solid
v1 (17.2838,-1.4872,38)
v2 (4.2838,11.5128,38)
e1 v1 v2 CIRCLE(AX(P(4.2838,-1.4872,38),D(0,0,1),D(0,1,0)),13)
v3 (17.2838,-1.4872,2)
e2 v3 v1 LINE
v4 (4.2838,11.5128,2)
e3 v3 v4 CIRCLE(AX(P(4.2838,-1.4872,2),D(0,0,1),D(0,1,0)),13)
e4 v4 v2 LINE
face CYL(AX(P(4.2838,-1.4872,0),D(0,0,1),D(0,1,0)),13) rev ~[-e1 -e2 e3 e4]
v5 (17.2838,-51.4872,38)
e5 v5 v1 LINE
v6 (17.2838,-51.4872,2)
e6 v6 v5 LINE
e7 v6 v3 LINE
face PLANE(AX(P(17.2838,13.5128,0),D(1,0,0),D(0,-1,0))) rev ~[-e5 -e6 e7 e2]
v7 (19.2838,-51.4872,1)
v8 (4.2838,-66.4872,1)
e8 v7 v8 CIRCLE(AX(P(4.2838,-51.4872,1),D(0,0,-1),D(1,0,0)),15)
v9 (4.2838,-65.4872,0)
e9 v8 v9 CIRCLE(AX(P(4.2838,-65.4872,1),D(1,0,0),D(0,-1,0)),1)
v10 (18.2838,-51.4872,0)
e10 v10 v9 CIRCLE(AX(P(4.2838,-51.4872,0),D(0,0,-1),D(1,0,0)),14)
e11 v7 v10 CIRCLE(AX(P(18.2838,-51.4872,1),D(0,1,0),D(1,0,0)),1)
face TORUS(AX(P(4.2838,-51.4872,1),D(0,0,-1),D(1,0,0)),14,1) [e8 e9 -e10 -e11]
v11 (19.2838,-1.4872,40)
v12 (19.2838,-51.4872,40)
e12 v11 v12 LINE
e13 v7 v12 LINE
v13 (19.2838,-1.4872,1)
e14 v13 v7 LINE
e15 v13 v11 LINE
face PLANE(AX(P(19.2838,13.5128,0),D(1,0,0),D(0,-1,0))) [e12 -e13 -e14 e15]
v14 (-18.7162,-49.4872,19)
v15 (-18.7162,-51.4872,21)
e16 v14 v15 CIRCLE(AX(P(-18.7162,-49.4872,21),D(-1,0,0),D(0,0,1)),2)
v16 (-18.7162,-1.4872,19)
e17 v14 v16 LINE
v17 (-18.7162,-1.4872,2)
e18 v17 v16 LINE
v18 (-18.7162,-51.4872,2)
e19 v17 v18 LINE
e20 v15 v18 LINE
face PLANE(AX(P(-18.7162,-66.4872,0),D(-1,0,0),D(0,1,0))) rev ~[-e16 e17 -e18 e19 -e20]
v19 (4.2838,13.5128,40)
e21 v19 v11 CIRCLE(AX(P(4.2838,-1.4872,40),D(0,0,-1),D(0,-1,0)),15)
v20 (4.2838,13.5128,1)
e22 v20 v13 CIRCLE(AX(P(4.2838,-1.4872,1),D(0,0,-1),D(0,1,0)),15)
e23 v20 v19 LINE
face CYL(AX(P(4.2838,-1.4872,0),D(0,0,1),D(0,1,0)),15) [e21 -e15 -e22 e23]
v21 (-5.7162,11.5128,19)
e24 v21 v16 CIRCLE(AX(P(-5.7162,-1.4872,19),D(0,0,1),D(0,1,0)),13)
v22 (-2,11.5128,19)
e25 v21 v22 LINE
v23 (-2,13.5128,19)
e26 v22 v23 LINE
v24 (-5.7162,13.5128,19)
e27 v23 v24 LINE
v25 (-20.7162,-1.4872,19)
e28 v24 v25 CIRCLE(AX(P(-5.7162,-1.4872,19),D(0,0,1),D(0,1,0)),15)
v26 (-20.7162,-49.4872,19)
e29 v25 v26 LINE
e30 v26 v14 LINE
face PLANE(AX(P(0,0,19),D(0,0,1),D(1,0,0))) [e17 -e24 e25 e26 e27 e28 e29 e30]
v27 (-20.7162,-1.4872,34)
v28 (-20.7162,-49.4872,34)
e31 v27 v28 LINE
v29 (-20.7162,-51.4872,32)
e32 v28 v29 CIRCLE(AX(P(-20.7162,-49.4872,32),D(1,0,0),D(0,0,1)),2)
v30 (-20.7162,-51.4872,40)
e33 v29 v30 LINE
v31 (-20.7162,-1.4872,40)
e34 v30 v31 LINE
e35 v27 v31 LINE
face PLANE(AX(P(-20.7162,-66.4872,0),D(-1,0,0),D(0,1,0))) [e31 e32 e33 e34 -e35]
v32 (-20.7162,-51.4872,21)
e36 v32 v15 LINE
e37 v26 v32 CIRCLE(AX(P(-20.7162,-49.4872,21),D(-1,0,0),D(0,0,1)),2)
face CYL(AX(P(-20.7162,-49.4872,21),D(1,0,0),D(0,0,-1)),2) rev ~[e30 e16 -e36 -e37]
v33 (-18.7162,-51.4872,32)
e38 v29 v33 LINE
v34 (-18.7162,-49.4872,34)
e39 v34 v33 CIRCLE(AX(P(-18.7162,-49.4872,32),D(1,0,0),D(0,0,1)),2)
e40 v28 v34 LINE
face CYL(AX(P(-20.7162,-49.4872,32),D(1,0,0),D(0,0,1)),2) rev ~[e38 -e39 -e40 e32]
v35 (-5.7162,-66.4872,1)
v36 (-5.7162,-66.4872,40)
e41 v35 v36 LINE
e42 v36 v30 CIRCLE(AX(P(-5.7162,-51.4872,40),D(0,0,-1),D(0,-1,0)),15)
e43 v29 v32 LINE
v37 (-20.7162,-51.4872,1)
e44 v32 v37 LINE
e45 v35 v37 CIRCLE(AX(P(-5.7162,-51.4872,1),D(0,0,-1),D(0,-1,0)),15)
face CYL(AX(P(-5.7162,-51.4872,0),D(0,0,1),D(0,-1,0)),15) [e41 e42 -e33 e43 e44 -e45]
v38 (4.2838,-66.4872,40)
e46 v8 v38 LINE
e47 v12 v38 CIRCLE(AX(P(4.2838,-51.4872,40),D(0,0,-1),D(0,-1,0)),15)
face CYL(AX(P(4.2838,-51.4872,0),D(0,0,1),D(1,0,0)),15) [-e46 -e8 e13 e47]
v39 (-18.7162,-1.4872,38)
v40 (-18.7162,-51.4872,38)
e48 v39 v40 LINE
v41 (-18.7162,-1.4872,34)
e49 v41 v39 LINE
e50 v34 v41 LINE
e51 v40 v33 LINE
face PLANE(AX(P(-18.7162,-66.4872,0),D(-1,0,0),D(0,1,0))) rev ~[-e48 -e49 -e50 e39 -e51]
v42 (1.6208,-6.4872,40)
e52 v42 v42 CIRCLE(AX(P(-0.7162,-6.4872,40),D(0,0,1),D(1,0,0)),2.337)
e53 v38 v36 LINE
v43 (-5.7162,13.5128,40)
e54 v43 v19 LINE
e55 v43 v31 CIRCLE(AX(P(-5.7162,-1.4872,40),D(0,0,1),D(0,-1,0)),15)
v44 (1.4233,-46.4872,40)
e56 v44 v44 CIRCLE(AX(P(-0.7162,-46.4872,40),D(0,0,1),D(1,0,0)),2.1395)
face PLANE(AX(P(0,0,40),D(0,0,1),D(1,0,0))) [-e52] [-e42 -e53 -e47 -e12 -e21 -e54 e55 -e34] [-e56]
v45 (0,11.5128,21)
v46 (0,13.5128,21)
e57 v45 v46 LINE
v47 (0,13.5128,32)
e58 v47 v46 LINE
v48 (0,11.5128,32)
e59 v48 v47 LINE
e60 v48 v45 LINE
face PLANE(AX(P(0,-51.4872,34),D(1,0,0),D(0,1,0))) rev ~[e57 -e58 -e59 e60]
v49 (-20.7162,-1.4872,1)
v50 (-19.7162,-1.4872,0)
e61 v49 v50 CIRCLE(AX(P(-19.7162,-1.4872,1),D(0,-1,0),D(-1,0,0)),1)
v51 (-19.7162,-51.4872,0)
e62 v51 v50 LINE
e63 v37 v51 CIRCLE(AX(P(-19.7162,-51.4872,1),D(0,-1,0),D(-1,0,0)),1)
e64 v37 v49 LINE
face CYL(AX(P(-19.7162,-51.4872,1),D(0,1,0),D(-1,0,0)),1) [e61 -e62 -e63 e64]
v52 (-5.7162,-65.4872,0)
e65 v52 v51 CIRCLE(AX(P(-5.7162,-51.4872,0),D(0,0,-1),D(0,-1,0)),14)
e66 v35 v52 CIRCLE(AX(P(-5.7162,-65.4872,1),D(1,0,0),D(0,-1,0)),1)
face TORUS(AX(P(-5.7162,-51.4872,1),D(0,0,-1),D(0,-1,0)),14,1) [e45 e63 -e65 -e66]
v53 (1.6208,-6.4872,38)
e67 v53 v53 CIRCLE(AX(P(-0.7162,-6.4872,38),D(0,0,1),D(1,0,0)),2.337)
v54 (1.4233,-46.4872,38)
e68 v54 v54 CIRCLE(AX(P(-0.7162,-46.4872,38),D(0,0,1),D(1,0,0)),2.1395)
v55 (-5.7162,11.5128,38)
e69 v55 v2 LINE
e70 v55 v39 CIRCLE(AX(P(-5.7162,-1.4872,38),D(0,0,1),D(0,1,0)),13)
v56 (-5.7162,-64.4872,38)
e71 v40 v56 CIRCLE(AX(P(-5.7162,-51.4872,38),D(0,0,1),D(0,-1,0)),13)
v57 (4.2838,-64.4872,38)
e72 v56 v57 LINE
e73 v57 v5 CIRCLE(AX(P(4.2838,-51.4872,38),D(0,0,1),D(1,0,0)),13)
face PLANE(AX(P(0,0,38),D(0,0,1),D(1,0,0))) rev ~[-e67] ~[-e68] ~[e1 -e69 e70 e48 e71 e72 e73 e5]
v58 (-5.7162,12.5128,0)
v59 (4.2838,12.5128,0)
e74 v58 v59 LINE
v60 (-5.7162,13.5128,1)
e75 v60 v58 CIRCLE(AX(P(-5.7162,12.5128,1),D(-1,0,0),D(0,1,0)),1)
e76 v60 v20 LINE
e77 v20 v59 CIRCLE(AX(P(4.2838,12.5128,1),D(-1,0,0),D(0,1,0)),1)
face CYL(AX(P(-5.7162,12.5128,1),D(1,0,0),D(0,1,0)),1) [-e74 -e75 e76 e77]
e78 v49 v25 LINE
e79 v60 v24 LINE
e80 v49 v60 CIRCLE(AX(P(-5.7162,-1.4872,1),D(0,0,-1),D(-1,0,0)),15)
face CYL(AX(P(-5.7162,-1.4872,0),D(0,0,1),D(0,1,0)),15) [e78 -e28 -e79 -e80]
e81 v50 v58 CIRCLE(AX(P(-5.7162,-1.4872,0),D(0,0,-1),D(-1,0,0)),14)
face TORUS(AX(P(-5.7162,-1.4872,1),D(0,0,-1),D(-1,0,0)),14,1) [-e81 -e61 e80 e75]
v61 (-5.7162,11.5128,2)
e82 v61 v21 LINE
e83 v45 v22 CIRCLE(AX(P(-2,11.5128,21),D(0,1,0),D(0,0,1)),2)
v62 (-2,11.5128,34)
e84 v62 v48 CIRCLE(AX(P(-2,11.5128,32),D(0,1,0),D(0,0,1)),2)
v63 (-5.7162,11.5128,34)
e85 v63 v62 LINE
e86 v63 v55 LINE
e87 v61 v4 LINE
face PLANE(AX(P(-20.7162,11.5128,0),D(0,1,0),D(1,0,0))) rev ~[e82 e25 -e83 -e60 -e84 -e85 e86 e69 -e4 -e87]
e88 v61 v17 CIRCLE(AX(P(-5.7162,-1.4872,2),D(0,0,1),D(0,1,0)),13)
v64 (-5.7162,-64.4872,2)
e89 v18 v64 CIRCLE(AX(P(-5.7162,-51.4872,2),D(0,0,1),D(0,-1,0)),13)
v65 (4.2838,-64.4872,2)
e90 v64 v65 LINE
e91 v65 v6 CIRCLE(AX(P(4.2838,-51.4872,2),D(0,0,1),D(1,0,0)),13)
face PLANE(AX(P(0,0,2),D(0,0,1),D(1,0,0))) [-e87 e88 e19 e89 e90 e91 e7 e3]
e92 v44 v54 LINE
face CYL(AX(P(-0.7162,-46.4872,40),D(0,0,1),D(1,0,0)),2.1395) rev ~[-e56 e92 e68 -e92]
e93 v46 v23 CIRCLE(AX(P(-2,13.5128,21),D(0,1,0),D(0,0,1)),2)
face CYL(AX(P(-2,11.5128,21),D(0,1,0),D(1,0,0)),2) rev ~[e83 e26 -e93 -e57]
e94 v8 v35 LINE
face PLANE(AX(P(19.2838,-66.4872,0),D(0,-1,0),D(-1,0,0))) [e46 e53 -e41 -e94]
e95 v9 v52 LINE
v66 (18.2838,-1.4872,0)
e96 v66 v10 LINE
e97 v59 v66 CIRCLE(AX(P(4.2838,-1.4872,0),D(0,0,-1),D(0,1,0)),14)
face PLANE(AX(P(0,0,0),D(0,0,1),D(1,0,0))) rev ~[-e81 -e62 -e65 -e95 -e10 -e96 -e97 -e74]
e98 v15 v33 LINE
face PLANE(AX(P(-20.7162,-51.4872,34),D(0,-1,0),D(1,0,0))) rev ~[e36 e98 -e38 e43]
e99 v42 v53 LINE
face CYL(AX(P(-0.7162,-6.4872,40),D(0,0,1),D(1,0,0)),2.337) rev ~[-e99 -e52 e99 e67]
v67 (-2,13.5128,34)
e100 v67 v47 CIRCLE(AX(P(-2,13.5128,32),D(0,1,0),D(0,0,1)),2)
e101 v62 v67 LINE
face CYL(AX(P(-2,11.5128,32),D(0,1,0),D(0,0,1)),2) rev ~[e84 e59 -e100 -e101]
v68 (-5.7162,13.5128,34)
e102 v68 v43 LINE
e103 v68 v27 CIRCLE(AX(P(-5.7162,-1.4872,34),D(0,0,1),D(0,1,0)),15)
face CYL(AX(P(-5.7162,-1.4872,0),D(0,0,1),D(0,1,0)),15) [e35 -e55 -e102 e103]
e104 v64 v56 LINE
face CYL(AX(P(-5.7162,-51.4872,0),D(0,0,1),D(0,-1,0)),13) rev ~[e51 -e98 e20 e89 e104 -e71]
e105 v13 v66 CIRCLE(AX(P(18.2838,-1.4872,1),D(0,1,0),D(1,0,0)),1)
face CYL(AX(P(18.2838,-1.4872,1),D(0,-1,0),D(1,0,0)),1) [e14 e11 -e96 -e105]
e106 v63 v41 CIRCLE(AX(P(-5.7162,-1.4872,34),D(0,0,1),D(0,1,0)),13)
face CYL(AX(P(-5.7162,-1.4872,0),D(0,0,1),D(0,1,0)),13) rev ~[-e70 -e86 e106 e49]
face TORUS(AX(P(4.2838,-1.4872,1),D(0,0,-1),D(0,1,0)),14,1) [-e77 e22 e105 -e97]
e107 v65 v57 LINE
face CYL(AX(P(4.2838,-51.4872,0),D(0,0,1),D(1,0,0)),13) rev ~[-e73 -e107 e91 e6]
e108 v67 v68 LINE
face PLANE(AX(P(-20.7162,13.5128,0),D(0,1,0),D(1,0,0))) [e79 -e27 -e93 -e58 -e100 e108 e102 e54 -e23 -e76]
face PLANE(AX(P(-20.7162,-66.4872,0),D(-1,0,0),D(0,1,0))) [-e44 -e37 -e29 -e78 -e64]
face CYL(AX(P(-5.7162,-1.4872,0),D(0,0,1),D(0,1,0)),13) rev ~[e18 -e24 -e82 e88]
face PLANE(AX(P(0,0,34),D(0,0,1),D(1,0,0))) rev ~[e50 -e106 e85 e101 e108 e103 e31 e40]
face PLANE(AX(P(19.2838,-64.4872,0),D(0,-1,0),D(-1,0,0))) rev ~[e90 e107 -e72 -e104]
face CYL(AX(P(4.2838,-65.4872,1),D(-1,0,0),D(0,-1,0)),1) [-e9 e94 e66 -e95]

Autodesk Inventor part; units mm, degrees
ref_plane "YZ Plane" through (0, 0, 0) normal (1, 0, 0) x (0, 1, 0)
ref_plane "XZ Plane" through (0, 0, 0) normal (0, 1, 0) x (-1, 0, 0)
ref_plane "XY Plane" through (0, 0, 0) normal (0, 0, 1) x (1, 0, 0)
sketch "Sketch1" plane through (0, 0, 0) normal (0, 0, 1) x (1, 0, 0)
  line L0 (-20.7162, 13.5128) -> (19.2838, 13.5128)
  line L1 (19.2838, 13.5128) -> (19.2838, -66.4872)
  line L2 (19.2838, -66.4872) -> (-20.7162, -66.4872)
  line L3 (-20.7162, -66.4872) -> (-20.7162, 13.5128)
  point P0 (0, 0)
  dimension "d0" = 40
  dimension "d1" = 80
extrude "Extrusion1" add sketch "Sketch1" along normal blind 40
fillet "Fillet1" radius 15 4 edges at (-20.7162, 13.5128, 20) (19.2838, 13.5128, 20) (-20.7162, -66.4872, 20) (19.2838, -66.4872, 20)
shell "Shell1" thickness 2 removed faces 0
ref_plane "Work Plane1" through (0, 0, 34) normal (0, 0, 1) x (1, 0, 0)
sketch "Sketch3" plane through (0, 0, 34) normal (0, 0, 1) x (1, 0, 0)
  arc A0 (-5.7162, 13.5128) -> (-20.7162, -1.4872) centre (-5.7162, -1.4872) ccw projected
  line L0 (-20.7162, -1.4872) -> (-20.7162, -51.4872) projected
  line L1 (-20.7162, -51.4872) -> (0, -51.4872)
  line L2 (0, -51.4872) -> (0, 13.5128)
  line L3 (0, 13.5128) -> (-5.7162, 13.5128)
  point P0 (0, 0)
extrude "Extrusion2" cut sketch "Sketch3" against normal blind 15
fillet "Fillet3" radius 2 4 edges at (0, 12.5128, 19) (0, 12.5128, 34) (-19.7162, -51.4872, 34) (-19.7162, -51.4872, 19)
sketch "Sketch4" plane through (0, 0, 40) normal (0, 0, 1) x (1, 0, 0)
  circle A0 centre (-0.7162, -46.4872) radius 2.1395
  circle A1 centre (-0.7162, -6.4872) radius 2.337
  line L0 (-20.7162, -1.4872) -> (-20.7162, -51.4872) projected
  line L1 (4.2838, 13.5128) -> (-5.7162, 13.5128) projected
  line L2 (-5.7162, -66.4872) -> (4.2838, -66.4872) projected
  point P0 (0, 0)
  dimension "d11" = 20
  dimension "d12" = 20
  dimension "d13" = 20
  dimension "d14" = 20
extrude "Extrusion3" cut sketch "Sketch4" against normal up to next
fillet "Fillet4" radius 1 8 edges at (-0.7162, 13.5128, 0) (-16.3228, 9.1194, 0) (-20.7162, -26.4872, 0) (-16.3228, -62.0938, 0) (-0.7162, -66.4872, 0) (14.8904, -62.0938, 0) (19.2838, -26.4872, 0) (14.8904, 9.1194, 0)
properties part number "lock-case"
